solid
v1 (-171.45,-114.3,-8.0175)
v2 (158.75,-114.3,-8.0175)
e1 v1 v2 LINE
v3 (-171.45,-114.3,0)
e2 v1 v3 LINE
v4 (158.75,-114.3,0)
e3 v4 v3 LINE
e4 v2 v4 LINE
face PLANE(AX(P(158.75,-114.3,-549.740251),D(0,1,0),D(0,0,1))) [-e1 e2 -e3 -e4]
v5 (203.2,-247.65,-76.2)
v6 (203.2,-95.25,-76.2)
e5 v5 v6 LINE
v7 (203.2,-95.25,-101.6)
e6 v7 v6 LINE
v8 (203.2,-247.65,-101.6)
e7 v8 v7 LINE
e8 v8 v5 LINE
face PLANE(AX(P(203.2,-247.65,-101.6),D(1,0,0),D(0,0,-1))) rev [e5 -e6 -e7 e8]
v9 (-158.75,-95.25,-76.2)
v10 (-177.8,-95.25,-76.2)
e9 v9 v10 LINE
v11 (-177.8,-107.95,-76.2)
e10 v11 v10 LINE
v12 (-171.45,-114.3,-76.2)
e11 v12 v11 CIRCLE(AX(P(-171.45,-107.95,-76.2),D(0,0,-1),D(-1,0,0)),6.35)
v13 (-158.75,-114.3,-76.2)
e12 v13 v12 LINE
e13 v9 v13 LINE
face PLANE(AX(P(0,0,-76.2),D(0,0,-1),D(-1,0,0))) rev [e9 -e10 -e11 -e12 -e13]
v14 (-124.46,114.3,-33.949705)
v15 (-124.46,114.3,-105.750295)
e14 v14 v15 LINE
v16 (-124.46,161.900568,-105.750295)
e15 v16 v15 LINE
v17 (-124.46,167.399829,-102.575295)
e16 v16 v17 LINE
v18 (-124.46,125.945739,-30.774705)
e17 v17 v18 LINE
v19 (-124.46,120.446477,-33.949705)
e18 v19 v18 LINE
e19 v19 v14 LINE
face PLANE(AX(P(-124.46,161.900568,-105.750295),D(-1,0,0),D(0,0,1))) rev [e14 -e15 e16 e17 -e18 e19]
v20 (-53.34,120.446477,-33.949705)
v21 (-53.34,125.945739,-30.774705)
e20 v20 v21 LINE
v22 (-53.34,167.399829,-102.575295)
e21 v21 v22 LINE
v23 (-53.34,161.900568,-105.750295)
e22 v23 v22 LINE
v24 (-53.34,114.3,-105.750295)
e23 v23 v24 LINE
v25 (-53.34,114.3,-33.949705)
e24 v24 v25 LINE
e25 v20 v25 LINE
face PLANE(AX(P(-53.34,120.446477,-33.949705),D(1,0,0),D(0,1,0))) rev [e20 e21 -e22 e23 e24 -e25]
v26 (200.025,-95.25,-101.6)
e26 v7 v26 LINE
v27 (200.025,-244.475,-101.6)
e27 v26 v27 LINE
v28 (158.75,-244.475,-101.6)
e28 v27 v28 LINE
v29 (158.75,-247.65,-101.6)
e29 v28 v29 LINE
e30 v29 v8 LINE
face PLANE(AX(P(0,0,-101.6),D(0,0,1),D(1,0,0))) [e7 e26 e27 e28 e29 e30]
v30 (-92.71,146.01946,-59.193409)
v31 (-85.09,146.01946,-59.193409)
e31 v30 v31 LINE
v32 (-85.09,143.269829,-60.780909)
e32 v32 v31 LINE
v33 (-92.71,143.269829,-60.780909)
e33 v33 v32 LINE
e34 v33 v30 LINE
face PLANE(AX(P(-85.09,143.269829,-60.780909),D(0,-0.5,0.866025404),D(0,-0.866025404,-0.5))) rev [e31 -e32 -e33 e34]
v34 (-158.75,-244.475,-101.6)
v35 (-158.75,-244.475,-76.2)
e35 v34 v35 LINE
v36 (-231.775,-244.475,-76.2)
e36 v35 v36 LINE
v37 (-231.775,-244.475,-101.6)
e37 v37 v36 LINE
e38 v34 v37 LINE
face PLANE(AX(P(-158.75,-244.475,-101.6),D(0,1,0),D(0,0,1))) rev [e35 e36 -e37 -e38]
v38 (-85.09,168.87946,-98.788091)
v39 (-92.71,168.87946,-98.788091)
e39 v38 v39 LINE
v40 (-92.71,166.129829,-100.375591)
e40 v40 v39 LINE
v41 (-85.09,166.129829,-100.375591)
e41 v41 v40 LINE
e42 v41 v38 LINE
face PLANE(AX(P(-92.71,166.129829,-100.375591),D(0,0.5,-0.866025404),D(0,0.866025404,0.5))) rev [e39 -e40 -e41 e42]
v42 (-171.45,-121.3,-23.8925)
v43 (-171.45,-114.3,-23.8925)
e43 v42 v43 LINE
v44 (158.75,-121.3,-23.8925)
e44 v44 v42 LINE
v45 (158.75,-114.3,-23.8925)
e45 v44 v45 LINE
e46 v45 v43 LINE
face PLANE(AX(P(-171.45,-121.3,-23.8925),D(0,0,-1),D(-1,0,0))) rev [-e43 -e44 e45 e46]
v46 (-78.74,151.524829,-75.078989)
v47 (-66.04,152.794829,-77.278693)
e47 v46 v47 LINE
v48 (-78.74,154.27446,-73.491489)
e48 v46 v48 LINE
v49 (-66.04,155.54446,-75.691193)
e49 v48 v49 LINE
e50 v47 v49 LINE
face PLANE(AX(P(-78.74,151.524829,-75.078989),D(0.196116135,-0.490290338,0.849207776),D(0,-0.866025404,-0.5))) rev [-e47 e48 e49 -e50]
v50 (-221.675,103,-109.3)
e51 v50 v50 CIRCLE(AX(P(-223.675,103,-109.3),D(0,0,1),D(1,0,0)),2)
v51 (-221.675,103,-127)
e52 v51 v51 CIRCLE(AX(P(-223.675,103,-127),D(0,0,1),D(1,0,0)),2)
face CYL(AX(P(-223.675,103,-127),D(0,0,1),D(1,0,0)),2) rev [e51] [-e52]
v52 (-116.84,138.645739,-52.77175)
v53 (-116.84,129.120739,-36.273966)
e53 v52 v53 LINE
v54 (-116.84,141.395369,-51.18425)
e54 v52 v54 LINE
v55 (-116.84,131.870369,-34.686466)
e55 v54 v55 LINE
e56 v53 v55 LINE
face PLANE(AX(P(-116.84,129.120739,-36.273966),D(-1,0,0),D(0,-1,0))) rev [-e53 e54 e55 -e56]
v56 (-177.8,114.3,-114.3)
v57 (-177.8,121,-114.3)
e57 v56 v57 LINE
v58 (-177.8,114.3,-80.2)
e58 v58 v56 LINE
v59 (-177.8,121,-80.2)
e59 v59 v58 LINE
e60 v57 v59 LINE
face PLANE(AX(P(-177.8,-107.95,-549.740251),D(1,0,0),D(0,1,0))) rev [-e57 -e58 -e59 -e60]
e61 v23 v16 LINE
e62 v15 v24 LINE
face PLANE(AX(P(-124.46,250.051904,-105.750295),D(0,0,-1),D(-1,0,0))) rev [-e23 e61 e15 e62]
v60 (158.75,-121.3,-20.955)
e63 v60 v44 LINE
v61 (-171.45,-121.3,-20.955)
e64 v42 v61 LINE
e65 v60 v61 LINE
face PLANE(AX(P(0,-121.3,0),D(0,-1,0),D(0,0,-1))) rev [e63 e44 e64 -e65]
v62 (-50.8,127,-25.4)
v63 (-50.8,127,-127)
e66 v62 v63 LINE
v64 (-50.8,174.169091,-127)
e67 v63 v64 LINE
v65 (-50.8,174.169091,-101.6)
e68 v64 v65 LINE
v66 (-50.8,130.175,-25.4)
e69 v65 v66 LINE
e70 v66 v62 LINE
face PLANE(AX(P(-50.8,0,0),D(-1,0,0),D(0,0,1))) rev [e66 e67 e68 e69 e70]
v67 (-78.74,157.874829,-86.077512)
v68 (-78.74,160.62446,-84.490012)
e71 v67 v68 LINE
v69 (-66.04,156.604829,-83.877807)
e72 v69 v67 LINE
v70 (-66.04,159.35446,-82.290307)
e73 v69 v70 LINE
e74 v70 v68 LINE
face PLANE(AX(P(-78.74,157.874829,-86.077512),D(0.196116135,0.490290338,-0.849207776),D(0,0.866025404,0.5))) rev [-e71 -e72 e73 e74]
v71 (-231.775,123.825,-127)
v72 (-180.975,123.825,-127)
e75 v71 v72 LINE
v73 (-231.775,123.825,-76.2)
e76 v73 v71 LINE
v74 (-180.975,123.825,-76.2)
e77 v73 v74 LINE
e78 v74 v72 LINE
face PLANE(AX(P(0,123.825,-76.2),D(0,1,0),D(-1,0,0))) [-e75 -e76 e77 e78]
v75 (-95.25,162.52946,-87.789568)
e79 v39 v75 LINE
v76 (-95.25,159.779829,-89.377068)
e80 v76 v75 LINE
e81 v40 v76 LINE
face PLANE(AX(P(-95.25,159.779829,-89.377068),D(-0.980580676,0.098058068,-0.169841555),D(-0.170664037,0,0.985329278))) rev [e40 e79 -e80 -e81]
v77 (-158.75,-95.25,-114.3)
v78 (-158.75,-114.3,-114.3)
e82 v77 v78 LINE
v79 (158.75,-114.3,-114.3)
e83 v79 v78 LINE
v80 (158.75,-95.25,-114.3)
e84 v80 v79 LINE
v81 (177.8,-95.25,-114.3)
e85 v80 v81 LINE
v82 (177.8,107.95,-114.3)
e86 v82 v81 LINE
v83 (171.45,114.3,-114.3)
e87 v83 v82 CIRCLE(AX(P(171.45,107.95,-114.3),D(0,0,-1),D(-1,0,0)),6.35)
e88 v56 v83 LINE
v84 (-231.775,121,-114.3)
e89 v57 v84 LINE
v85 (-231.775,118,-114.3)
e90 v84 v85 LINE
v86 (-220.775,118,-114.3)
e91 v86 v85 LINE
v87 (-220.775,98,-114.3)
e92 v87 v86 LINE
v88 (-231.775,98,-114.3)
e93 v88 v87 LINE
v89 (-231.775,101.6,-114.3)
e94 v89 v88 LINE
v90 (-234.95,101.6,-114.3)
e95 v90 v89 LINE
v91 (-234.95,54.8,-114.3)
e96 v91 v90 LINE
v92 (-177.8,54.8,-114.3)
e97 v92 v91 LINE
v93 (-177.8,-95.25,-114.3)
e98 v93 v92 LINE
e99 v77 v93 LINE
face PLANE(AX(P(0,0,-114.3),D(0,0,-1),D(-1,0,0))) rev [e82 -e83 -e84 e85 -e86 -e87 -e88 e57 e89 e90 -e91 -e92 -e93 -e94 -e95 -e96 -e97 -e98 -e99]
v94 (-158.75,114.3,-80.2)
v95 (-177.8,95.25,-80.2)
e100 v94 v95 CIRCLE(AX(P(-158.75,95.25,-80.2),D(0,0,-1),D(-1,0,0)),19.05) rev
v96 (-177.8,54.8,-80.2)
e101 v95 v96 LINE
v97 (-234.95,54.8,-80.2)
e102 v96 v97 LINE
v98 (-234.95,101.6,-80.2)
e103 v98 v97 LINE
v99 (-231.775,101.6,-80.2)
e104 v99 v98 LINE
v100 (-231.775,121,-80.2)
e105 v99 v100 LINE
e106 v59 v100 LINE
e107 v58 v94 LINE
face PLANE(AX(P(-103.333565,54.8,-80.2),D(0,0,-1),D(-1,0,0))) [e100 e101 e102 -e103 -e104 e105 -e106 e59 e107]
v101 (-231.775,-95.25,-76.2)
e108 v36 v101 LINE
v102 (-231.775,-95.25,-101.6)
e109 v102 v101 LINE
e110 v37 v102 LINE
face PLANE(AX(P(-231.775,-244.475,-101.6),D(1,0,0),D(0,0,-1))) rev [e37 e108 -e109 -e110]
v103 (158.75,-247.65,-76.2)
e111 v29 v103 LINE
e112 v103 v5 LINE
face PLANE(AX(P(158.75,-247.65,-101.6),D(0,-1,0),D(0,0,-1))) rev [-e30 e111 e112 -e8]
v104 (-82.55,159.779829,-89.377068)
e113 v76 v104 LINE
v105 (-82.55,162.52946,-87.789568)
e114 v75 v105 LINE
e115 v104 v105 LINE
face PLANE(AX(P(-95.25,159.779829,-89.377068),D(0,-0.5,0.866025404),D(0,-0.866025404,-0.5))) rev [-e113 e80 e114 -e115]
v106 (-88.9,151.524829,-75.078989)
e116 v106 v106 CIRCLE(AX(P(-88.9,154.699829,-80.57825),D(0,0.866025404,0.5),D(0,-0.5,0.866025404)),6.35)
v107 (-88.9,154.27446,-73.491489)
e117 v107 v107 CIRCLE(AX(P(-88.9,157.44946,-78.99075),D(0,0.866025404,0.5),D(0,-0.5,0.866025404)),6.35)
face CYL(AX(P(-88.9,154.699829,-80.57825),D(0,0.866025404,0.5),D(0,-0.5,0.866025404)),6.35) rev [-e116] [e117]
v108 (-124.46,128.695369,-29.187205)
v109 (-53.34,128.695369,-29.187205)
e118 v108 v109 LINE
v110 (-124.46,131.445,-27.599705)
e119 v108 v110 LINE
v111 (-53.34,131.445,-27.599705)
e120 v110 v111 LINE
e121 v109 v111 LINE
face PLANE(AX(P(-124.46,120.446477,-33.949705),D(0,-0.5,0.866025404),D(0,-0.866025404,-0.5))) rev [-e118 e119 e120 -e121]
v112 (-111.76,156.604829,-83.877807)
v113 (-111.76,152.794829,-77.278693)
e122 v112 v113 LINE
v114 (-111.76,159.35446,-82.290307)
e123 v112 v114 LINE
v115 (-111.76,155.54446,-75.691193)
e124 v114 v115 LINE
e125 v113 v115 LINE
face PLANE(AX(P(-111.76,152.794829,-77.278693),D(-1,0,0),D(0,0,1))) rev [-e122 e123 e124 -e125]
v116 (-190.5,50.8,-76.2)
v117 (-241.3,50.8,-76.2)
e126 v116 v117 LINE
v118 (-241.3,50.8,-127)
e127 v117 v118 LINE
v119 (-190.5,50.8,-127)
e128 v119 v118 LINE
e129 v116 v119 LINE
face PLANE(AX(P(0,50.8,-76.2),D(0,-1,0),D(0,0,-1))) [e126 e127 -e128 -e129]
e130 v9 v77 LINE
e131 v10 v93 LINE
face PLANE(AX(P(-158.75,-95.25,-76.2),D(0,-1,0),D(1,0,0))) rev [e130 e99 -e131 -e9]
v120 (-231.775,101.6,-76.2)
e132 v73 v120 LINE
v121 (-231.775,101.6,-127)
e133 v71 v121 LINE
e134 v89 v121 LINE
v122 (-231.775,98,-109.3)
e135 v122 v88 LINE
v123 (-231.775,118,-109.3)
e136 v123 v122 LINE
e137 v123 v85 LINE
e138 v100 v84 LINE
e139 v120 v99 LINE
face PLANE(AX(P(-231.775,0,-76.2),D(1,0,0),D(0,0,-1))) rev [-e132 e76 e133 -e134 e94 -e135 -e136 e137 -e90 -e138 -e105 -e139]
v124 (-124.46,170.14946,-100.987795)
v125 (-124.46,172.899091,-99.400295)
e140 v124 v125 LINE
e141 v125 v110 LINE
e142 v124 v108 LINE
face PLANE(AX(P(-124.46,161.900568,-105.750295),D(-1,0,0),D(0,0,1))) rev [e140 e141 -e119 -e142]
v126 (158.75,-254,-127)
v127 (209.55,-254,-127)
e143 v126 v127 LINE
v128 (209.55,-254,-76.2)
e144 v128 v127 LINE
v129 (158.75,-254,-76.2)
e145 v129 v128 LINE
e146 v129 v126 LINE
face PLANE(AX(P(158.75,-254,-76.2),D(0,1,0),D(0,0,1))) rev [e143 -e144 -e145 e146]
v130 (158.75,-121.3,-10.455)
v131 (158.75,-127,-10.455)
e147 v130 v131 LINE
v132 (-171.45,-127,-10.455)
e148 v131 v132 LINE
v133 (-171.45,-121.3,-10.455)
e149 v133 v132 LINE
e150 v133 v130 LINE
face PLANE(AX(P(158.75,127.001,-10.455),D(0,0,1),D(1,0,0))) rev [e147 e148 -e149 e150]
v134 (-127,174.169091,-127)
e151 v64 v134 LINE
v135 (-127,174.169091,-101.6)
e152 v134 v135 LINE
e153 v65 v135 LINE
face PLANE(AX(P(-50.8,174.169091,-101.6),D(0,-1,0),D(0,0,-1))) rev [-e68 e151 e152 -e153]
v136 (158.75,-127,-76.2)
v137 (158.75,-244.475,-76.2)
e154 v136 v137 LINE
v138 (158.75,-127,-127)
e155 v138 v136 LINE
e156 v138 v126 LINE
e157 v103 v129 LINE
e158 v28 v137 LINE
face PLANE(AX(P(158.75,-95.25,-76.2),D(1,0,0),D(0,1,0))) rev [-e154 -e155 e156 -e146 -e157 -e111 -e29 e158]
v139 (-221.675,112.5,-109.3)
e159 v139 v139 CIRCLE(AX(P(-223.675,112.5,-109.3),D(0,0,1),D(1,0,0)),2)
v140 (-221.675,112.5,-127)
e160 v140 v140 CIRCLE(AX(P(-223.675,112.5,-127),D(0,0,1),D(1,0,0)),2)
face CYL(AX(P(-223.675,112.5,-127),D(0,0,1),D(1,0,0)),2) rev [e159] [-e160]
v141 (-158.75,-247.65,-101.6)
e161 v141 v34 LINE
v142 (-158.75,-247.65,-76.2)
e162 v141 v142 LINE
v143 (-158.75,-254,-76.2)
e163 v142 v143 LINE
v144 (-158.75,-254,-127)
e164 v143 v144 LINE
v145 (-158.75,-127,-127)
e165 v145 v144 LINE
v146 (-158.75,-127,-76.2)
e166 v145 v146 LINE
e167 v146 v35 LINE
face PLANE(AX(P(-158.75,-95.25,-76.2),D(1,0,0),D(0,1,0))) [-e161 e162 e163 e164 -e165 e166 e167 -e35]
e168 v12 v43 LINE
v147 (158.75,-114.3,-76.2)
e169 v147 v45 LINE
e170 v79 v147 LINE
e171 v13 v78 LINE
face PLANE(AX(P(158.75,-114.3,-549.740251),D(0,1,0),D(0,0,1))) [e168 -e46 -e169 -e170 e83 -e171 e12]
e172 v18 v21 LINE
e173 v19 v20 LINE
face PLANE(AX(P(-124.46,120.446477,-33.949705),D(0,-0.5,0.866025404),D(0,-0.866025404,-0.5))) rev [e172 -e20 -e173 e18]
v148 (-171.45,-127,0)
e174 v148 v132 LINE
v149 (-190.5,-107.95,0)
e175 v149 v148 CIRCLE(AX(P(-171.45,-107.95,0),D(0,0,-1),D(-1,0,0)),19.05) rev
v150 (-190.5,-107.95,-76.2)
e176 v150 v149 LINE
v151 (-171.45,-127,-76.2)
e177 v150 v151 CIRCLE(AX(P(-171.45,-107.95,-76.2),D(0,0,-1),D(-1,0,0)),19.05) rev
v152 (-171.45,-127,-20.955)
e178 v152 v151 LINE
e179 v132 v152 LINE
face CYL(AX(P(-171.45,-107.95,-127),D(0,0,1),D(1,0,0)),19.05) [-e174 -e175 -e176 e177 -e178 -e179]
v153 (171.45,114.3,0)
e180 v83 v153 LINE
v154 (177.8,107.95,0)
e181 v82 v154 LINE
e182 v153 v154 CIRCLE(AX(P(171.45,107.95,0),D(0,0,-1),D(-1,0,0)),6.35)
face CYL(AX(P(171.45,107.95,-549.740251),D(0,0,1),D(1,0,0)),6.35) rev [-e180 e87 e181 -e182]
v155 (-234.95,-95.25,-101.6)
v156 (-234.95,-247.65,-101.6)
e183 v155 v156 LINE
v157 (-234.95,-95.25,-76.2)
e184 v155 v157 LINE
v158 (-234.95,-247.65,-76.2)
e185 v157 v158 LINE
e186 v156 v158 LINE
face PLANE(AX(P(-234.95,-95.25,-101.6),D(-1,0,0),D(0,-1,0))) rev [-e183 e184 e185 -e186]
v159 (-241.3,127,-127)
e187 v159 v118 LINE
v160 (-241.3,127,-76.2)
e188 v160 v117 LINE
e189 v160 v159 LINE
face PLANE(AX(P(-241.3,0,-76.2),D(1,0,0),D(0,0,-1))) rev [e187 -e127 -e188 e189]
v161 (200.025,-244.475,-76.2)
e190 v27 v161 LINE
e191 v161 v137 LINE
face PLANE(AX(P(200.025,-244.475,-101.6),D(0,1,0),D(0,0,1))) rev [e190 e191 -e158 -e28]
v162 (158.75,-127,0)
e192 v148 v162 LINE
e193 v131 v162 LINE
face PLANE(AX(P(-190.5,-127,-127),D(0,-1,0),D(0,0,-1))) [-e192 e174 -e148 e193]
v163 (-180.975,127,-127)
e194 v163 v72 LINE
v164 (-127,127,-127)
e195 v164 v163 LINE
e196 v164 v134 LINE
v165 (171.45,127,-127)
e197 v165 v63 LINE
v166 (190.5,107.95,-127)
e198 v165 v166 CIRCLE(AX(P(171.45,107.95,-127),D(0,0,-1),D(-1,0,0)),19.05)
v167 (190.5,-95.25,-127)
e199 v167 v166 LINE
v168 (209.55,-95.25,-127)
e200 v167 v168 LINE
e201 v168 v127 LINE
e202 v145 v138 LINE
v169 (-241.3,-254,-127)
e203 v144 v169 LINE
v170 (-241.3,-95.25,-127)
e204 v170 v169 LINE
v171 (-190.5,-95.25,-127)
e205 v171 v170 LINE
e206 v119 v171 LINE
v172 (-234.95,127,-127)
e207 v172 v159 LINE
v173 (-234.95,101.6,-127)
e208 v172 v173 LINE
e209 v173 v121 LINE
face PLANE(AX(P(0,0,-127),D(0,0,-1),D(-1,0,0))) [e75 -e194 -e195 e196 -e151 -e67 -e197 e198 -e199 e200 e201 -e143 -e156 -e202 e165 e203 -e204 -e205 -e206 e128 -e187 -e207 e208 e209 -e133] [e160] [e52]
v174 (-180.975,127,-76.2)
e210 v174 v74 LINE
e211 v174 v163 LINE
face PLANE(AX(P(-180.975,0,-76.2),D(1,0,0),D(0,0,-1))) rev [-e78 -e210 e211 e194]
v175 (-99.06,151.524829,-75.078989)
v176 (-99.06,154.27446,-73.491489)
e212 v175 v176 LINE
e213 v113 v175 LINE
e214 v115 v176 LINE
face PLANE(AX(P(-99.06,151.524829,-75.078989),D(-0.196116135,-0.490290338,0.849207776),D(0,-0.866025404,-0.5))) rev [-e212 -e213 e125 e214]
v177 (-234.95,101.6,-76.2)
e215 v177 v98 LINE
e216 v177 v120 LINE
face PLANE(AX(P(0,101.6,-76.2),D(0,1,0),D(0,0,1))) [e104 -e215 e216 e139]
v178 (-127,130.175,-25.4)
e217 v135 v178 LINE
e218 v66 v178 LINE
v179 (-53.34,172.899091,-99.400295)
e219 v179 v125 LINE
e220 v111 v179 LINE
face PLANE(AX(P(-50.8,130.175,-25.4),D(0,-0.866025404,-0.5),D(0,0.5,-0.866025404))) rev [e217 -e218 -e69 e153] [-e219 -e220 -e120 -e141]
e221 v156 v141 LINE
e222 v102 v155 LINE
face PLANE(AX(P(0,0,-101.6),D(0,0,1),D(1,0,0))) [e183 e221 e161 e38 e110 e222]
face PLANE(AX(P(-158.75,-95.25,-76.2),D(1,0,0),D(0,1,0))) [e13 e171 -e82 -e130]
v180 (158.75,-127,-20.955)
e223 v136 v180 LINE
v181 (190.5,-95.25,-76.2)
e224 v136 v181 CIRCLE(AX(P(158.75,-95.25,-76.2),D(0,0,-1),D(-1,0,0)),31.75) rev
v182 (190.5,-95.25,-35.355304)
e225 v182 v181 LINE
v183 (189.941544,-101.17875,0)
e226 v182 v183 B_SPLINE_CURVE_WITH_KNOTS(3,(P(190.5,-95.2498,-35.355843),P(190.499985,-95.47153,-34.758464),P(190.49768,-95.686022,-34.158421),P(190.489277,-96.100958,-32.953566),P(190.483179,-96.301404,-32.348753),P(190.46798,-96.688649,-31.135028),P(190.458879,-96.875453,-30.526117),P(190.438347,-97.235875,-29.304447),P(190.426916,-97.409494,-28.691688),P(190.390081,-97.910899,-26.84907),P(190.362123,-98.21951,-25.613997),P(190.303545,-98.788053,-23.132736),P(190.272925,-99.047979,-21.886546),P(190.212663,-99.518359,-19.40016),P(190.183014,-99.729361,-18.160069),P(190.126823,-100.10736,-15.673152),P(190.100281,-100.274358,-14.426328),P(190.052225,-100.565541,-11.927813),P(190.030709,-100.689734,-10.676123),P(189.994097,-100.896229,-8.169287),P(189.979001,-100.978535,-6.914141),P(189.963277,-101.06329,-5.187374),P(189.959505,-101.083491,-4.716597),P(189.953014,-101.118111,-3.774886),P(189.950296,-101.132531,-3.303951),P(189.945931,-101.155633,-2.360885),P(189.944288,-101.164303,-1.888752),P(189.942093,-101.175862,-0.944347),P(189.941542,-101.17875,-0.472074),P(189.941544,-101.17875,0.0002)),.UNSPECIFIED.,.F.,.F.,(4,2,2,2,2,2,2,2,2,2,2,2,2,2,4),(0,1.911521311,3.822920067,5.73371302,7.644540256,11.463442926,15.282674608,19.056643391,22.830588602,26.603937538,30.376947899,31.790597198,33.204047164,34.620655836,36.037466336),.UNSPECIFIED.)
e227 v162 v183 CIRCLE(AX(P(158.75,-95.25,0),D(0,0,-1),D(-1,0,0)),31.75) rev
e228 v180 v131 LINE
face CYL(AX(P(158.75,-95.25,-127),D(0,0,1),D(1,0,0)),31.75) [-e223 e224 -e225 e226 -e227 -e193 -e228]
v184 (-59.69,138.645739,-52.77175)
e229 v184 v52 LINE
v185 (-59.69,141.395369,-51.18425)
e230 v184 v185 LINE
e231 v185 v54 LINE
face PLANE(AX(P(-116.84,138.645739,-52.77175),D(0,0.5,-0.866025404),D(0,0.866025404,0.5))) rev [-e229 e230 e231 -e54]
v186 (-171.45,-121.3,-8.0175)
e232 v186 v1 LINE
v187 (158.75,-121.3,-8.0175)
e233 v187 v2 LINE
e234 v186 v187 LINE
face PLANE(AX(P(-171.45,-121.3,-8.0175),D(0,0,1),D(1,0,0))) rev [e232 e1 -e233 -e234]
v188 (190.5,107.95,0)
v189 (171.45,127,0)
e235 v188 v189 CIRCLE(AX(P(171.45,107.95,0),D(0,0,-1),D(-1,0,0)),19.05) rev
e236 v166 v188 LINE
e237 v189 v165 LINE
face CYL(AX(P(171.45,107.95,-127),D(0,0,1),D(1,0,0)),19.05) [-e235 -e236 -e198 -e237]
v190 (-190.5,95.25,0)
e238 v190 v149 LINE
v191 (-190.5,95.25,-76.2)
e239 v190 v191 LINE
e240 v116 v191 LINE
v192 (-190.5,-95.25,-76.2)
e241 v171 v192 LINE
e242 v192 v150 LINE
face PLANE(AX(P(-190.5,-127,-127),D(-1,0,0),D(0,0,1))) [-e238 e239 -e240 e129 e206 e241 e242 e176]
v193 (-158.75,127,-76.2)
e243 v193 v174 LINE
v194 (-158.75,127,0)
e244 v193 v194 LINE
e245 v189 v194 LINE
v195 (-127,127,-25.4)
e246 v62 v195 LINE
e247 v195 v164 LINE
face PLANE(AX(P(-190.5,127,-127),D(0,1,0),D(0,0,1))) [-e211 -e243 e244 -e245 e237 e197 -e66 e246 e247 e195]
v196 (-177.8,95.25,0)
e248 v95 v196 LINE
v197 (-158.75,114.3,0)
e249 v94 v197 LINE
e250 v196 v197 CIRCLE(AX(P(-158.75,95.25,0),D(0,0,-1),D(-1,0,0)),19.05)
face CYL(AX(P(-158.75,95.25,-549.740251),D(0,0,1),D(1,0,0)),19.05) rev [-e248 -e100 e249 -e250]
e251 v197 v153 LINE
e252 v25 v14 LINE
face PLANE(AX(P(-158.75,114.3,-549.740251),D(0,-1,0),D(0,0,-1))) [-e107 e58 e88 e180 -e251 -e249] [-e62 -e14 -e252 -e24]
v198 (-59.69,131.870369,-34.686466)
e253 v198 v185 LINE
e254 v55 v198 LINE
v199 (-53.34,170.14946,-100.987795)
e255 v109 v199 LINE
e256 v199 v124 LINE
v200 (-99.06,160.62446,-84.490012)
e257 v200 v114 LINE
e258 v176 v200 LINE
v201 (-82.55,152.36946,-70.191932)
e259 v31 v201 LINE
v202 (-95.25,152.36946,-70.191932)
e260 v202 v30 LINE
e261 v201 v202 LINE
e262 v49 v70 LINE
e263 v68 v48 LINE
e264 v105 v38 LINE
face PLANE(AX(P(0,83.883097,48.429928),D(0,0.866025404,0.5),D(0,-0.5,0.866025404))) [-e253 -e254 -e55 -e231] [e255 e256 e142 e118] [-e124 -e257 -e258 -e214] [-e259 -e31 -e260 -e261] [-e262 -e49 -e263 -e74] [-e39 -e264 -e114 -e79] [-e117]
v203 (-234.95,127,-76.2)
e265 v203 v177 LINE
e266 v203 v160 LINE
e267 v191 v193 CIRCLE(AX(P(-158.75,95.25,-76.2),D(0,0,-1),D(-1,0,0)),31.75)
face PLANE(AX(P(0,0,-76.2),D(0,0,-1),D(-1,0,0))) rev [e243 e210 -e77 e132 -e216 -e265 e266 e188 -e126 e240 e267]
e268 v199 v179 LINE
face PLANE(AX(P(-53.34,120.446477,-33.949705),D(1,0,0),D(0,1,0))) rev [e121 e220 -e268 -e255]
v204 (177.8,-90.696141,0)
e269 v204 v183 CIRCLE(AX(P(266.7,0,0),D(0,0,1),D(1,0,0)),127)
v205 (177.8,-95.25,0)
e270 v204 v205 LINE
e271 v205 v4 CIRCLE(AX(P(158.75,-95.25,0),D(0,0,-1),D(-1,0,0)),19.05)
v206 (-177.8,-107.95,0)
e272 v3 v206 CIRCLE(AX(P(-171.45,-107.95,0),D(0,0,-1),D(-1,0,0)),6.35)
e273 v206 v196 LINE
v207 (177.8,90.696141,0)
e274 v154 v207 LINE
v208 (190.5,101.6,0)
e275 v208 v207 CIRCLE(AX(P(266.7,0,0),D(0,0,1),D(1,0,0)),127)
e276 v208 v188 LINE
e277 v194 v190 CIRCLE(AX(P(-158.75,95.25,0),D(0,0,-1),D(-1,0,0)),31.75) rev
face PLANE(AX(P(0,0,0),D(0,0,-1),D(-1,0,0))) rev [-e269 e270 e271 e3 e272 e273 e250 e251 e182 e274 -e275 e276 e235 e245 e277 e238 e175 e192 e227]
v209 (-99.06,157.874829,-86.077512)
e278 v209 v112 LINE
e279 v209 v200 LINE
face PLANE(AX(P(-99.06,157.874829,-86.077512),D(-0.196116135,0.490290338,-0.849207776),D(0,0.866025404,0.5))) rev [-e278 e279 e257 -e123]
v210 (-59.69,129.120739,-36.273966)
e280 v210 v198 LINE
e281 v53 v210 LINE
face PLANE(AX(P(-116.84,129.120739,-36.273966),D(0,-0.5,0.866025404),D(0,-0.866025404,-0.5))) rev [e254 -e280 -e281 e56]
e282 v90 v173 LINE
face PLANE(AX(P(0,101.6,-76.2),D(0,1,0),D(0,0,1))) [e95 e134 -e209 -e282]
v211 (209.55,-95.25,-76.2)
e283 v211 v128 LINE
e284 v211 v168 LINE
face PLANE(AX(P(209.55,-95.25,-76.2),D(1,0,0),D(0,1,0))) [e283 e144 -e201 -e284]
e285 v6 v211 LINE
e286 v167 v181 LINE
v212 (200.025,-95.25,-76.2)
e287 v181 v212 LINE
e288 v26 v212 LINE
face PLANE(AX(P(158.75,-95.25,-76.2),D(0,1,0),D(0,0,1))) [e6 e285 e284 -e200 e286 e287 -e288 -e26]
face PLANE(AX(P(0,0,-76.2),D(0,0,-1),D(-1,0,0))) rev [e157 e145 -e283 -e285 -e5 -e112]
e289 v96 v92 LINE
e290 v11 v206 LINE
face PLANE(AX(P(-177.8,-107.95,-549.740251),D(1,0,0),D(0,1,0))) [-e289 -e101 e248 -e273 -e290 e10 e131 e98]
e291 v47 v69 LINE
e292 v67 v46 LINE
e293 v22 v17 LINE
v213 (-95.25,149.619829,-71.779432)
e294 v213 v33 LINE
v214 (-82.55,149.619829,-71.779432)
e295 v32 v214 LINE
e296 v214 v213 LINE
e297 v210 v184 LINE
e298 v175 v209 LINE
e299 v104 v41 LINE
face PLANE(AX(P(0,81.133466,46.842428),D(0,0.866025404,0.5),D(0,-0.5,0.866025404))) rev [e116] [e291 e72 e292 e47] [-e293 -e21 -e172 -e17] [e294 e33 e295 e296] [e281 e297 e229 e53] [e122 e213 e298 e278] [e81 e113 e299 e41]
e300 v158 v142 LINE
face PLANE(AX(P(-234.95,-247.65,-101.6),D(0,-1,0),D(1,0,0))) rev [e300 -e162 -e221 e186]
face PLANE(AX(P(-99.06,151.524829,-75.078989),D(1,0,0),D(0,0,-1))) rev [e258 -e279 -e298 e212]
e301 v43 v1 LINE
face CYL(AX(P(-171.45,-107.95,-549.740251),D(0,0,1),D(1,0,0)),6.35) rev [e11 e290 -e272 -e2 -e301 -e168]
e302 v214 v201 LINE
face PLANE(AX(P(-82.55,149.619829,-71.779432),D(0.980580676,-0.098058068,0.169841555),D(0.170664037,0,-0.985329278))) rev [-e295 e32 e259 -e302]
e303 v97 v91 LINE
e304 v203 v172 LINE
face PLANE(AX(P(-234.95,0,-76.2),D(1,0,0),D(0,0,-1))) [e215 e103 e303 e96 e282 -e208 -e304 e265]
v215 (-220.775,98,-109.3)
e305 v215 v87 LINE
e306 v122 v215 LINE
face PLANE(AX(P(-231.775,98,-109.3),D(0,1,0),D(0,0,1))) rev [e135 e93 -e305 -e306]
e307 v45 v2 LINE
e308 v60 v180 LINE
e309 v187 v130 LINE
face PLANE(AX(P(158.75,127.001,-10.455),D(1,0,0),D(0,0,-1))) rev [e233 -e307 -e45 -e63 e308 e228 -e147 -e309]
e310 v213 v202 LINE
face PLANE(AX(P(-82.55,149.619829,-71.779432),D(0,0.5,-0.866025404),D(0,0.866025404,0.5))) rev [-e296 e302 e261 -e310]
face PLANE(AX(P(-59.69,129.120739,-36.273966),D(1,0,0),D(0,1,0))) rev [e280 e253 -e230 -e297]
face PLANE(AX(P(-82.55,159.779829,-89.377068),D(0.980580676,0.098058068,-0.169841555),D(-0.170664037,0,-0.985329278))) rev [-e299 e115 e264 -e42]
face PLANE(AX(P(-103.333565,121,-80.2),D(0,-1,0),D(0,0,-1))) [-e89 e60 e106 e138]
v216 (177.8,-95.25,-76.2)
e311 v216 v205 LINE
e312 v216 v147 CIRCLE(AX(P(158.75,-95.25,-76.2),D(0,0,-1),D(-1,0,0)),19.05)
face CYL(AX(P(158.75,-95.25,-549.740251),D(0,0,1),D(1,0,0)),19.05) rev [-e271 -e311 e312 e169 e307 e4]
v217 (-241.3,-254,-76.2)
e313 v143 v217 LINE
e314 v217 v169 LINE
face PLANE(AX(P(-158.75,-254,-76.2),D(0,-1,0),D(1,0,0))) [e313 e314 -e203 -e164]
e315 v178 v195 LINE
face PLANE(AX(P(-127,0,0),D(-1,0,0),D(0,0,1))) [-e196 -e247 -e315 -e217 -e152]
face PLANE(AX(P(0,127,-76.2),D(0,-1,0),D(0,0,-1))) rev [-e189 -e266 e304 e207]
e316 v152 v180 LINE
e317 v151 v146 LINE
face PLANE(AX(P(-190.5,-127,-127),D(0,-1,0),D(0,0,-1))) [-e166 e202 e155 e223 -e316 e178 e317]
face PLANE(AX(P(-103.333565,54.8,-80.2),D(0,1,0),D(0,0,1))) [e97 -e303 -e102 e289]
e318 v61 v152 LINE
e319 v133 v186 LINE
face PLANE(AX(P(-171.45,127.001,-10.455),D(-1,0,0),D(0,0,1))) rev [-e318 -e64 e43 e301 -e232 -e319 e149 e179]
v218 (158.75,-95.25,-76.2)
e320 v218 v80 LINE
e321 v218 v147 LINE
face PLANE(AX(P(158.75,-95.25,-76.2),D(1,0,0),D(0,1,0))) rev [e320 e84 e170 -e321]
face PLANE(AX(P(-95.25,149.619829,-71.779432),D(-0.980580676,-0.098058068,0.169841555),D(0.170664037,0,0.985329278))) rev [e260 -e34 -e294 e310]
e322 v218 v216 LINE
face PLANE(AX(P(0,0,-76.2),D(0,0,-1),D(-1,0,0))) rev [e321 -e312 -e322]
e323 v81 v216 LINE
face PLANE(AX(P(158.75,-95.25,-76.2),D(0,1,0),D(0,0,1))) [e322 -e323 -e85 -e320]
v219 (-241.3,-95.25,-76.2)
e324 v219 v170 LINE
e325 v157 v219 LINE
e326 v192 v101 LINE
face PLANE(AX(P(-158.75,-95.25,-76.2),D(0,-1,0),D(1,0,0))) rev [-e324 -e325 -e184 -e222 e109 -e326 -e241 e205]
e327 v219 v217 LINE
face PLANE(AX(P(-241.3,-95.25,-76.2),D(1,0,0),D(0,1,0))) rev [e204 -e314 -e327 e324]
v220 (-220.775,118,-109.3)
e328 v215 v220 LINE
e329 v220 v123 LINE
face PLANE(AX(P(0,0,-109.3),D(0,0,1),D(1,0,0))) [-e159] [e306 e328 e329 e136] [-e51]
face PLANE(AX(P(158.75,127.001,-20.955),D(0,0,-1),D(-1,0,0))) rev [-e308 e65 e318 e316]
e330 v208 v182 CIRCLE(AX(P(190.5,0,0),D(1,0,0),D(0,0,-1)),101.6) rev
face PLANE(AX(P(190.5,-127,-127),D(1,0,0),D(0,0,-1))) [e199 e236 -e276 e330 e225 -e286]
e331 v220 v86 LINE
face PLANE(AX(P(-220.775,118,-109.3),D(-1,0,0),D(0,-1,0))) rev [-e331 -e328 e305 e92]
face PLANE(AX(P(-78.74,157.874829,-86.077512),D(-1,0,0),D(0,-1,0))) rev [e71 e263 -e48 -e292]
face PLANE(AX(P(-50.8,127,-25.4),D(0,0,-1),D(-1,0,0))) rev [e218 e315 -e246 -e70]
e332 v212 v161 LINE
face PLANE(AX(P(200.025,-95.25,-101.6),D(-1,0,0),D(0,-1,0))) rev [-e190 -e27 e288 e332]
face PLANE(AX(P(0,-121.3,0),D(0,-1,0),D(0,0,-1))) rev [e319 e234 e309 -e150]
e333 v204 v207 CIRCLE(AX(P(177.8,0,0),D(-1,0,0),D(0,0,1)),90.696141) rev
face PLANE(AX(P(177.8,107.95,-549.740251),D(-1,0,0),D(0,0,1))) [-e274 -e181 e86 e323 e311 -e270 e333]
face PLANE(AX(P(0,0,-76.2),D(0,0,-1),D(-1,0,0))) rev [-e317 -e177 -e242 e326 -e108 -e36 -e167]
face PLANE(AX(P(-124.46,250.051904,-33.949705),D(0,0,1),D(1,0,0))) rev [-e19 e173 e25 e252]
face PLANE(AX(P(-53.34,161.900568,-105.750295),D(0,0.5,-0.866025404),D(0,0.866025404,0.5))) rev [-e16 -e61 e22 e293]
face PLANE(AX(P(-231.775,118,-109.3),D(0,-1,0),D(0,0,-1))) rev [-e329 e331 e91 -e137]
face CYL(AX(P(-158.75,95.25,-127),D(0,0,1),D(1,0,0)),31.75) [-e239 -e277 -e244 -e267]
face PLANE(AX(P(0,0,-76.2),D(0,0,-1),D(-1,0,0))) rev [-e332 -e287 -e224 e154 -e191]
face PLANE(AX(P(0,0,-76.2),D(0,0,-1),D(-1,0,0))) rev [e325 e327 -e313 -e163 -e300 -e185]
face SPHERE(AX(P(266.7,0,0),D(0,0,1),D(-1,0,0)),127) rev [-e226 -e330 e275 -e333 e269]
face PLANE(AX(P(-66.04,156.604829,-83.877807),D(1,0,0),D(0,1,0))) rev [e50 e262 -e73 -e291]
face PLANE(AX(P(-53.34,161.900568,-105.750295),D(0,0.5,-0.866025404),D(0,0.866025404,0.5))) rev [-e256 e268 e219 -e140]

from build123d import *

# Parameters (mm, degrees)
SKETCH1_W           = 381
SKETCH1_H           = 254
BOSS_EXTRUDE1_DEPTH = 127
FILLET5_R           = 19.05
FILLET4_R           = 31.75
CUT_EXTRUDE1_DEPTH  = 114.3
CUT_EXTRUDE2_REACH  = 343.958
SKETCH5_W           = 330.2
SKETCH5_H           = 10.5
BOSS_EXTRUDE2_START = -50.8
BOSS_EXTRUDE2_DEPTH = 50.8
CUT_EXTRUDE3_DEPTH  = 25.4
BOSS_EXTRUDE3_DEPTH = 76.2
SKETCH10_W          = 71.12
SKETCH10_H          = 82.908181025
CUT_EXTRUDE4_DEPTH  = 12.7
CUT_EXTRUDE5_REACH  = 460.257
SKETCH11_W          = 71.12
SKETCH11_H          = 71.800590948
SKETCH12_W          = 71.12
SKETCH12_H          = 82.908181025
SKETCH12_R          = 6.35
SKETCH12_W_2        = 57.15
SKETCH12_H_2        = 19.05
BOSS_EXTRUDE4_DEPTH = 3.175
SKETCH13_W          = 330.2
SKETCH13_H          = 15.875
CUT_EXTRUDE6_DEPTH  = 7
SKETCH14_W          = 34.1
SKETCH14_H          = 66.2
CUT_EXTRUDE7_DEPTH  = 57.15
CUT_EXTRUDE8_START  = 34.1
CUT_EXTRUDE8_DEPTH  = 34.1
SKETCH16_W          = 11
SKETCH16_H          = 20
BOSS_EXTRUDE5_DEPTH = 5
SKETCH17_R          = 2
CUT_EXTRUDE9_DEPTH  = 367.998882862


# Read off the part's stored shape, not the designer's step: Boss-Extrude2
with BuildPart() as part:
    # Sketch1 → Boss-Extrude1 (new body)
    with BuildSketch(Plane.XY):
        Rectangle(SKETCH1_W, SKETCH1_H)
    extrude(amount=-BOSS_EXTRUDE1_DEPTH)

    # Fillet5
    fillet5_edges = [part.edges().sort_by_distance(p)[0] for p in [
        (-190.5, -127, -63.5),
        (190.5, 127, -63.5),
    ]]
    fillet(fillet5_edges, radius=FILLET5_R)

    # Fillet4
    fillet4_edges = [part.edges().sort_by_distance(p)[0] for p in [
        (190.5, -127, -63.5),
        (-190.5, 127, -63.5),
    ]]
    fillet(fillet4_edges, radius=FILLET4_R)

    # Sketch3 → Cut-Extrude1 (cut)
    with BuildSketch(Plane(origin=(0, 0, 0), x_dir=(-1, 0, 0), z_dir=(0, 0, -1))):
        with BuildLine():
            Line((-158.75, -114.3), (171.45, -114.3))
            ThreePointArc((171.45, -114.3), (175.940128061, -112.440128061), (177.8, -107.95))
            Line((177.8, -107.95), (177.8, 95.25))
            ThreePointArc((177.8, 95.25), (172.220384182, 108.720384182), (158.75, 114.3))
            Line((158.75, 114.3), (-171.45, 114.3))
            ThreePointArc((-171.45, 114.3), (-175.940128061, 112.440128061), (-177.8, 107.95))
            Line((-177.8, 107.95), (-177.8, -95.25))
            ThreePointArc((-177.8, -95.25), (-172.220384182, -108.720384182), (-158.75, -114.3))
        make_face()
    extrude(amount=CUT_EXTRUDE1_DEPTH, mode=Mode.SUBTRACT)

    # Sketch5 → Cut-Extrude2 (cut, up to next)
    with BuildSketch(Plane.XZ.offset(127), mode=Mode.PRIVATE) as cut_extrude2_sk1:
        with Locations((-6.35, -15.705)):
            Rectangle(SKETCH5_W, SKETCH5_H)
    cut_extrude2_tool1 = extrude(cut_extrude2_sk1.sketch, amount=-CUT_EXTRUDE2_REACH, mode=Mode.PRIVATE) & part.part
    add(cut_extrude2_tool1.solids().sort_by_distance((-6.35, -127, -15.705))[0], mode=Mode.SUBTRACT)

    # Sketch6 → Cut-Revolve1 (revolve, cut)
    with BuildSketch(Plane(origin=(0, 0, 0), x_dir=(1, 0, 0), z_dir=(0, 1, 0))):
        with BuildLine():
            Line((139.7, 0), (266.7, 0))
            Line((266.7, 0), (266.7, 127))
            ThreePointArc((266.7, 127), (176.897438789, 89.802561211), (139.7, 0))
        make_face()
    revolve(axis=Axis((266.7, 0, 0), (0, 0, -1)), mode=Mode.SUBTRACT)

    # Boss-Extrude2 outline → Boss-Extrude2 (add)
    with BuildSketch(Plane(origin=(0, 0, -127), x_dir=(-1, 0, 0), z_dir=(0, 0, -1)).offset(BOSS_EXTRUDE2_START)):
        with BuildLine():
            Line((-158.75, -254), (-158.75, -127))
            ThreePointArc((-158.75, -127), (-181.200640303, -117.700640303), (-190.5, -95.25))
            Line((-190.5, -95.25), (-209.55, -95.25))
            Line((-209.55, -95.25), (-209.55, -254))
            Line((-209.55, -254), (-158.75, -254))
        make_face()
        with BuildLine():
            ThreePointArc((-177.8, -95.25), (-172.220384182, -108.720384182), (-158.75, -114.3))
            Line((-158.75, -114.3), (-158.75, -95.25))
            Line((-158.75, -95.25), (-177.8, -95.25))
        make_face()
        with BuildLine():
            Line((158.75, -95.25), (158.75, -114.3))
            Line((158.75, -114.3), (171.45, -114.3))
            ThreePointArc((171.45, -114.3), (175.940128061, -112.440128061), (177.8, -107.95))
            Line((177.8, -107.95), (177.8, -95.25))
            Line((177.8, -95.25), (158.75, -95.25))
        make_face()
        with BuildLine():
            Line((241.3, -95.25), (190.5, -95.25))
            Line((190.5, -95.25), (190.5, -107.95))
            ThreePointArc((190.5, -107.95), (184.920384182, -121.420384182), (171.45, -127))
            Line((171.45, -127), (158.75, -127))
            Line((158.75, -127), (158.75, -254))
            Line((158.75, -254), (241.3, -254))
            Line((241.3, -254), (241.3, -95.25))
        make_face()
        with BuildLine():
            Line((241.3, 127), (234.95, 127))
            Line((234.95, 127), (234.95, 101.6))
            Line((234.95, 101.6), (231.775, 101.6))
            Line((231.775, 101.6), (231.775, 123.825))
            Line((231.775, 123.825), (180.975, 123.825))
            Line((180.975, 123.825), (180.975, 127))
            Line((180.975, 127), (158.75, 127))
            ThreePointArc((158.75, 127), (181.200640303, 117.700640303), (190.5, 95.25))
            Line((190.5, 95.25), (190.5, 50.8))
            Line((190.5, 50.8), (241.3, 50.8))
            Line((241.3, 50.8), (241.3, 127))
        make_face()
    extrude(amount=BOSS_EXTRUDE2_DEPTH)

    # Sketch8 → Cut-Extrude3 (cut)
    with BuildSketch(Plane.XY.offset(-76.2)):
        Polygon((-234.95, -95.25), (-234.95, -247.65), (-158.75, -247.65), (-158.75, -244.475), (-231.775, -244.475), (-231.775, -95.25), align=None)
        Polygon((158.75, -247.65), (203.2, -247.65), (203.2, -95.25), (200.025, -95.25), (200.025, -244.475), (158.75, -244.475), align=None)
    extrude(amount=-CUT_EXTRUDE3_DEPTH, mode=Mode.SUBTRACT)

    # Sketch9 → Boss-Extrude3 (add)
    with BuildSketch(Plane(origin=(-127, 0, 0), x_dir=(0, 0, -1), z_dir=(1, 0, 0))):
        Polygon((25.4, 127), (25.4, 130.175), (101.6, 174.169090512), (127, 174.169090512), (127, 127), align=None)
    extrude(amount=BOSS_EXTRUDE3_DEPTH)

    # Sketch10 → Cut-Extrude4 (cut)
    with BuildSketch(Plane(origin=(0, 86.632727372, 50.017428469), x_dir=(1, 0, 0), z_dir=(0, 0.866025403784436, 0.5000000000000047))):
        with Locations((-88.9, 131.078635769)):
            Rectangle(SKETCH10_W, SKETCH10_H)
    extrude(amount=-CUT_EXTRUDE4_DEPTH, mode=Mode.SUBTRACT)

    # Cut-Extrude5: up to this face of the body (flat: up to its plane)
    cut_extrude5_end = Plane(part.part.faces().sort_by_distance((-88.9, 141.173522628, -69.85))[0])
    # Sketch11 → Cut-Extrude5 (cut, up to the picked face)
    with BuildSketch(Plane.XZ.offset(-114.3), mode=Mode.PRIVATE) as cut_extrude5_sk1:
        with Locations((-88.9, -69.85)):
            Rectangle(SKETCH11_W, SKETCH11_H)
    cut_extrude5_tool1 = split(extrude(cut_extrude5_sk1.sketch, amount=-CUT_EXTRUDE5_REACH, mode=Mode.PRIVATE), bisect_by=cut_extrude5_end, keep=Keep.BOTH, mode=Mode.PRIVATE)
    add(cut_extrude5_tool1.solids().sort_by(Axis((-88.9, 114.3, -69.85), (0, 1, 0)))[0], mode=Mode.SUBTRACT)

    # Sketch12 → Boss-Extrude4 (add)
    with BuildSketch(Plane(origin=(0, 83.883096715, 48.429928469), x_dir=(1, 0, 0), z_dir=(0, 0.866025403784436, 0.5000000000000047))):
        with Locations((-88.9, 131.078635769)):
            Rectangle(SKETCH12_W, SKETCH12_H)
        with Locations(Location((-88.9, 147.132726281, 0), (0, 0, 270))):
            Circle(SKETCH12_R, mode=Mode.SUBTRACT)
        Polygon((-82.55, 136.972726281), (-95.25, 136.972726281), (-92.71, 124.272726281), (-85.09, 124.272726281), align=None, mode=Mode.SUBTRACT)
        Polygon((-78.74, 153.482726281), (-66.04, 150.942726281), (-66.04, 143.322726281), (-78.74, 140.782726281), align=None, mode=Mode.SUBTRACT)
        Polygon((-99.06, 140.782726281), (-99.06, 153.482726281), (-111.76, 150.942726281), (-111.76, 143.322726281), align=None, mode=Mode.SUBTRACT)
        Polygon((-95.25, 157.292726281), (-82.55, 157.292726281), (-85.09, 169.992726281), (-92.71, 169.992726281), align=None, mode=Mode.SUBTRACT)
        with Locations((-88.265, 105.499545256)):
            Rectangle(SKETCH12_W_2, SKETCH12_H_2, mode=Mode.SUBTRACT)
    extrude(amount=-BOSS_EXTRUDE4_DEPTH)

    # Sketch13 → Cut-Extrude6 (cut)
    with BuildSketch(Plane(origin=(0, -114.3, 0), x_dir=(1, 0, 0), z_dir=(0, 1, 0))):
        with Locations((-6.35, 15.955)):
            Rectangle(SKETCH13_W, SKETCH13_H)
    extrude(amount=-CUT_EXTRUDE6_DEPTH, mode=Mode.SUBTRACT)

    # Sketch14 → Cut-Extrude7 (cut)
    with BuildSketch(Plane(origin=(-234.95, 0, 0), x_dir=(0, 0, -1), z_dir=(1, 0, 0))):
        with Locations((97.25, 87.9)):
            Rectangle(SKETCH14_W, SKETCH14_H)
    extrude(amount=CUT_EXTRUDE7_DEPTH, mode=Mode.SUBTRACT)

    # Sketch15 → Cut-Extrude8 (cut)
    with BuildSketch(Plane.XY.offset(-114.3).offset(CUT_EXTRUDE8_START)):
        with BuildLine():
            Line((-158.75, 114.3), (-177.8, 114.3))
            Line((-177.8, 114.3), (-177.8, 95.25))
            ThreePointArc((-177.8, 95.25), (-172.220384182, 108.720384182), (-158.75, 114.3))
        make_face()
    extrude(amount=-CUT_EXTRUDE8_DEPTH, mode=Mode.SUBTRACT)

    # Sketch16 → Boss-Extrude5 (add)
    with BuildSketch(Plane.XY.offset(-114.3)):
        with Locations((-226.275, 108)):
            Rectangle(SKETCH16_W, SKETCH16_H)
    extrude(amount=BOSS_EXTRUDE5_DEPTH)

    # Sketch17 → Cut-Extrude9 (cut, through all)
    with BuildSketch(Plane.XY.offset(-109.3)):
        with Locations((-223.675, 112.5)):
            Circle(SKETCH17_R)
        with Locations((-223.675, 103)):
            Circle(SKETCH17_R)
    extrude(amount=-CUT_EXTRUDE9_DEPTH, mode=Mode.SUBTRACT)


solid = part.part
